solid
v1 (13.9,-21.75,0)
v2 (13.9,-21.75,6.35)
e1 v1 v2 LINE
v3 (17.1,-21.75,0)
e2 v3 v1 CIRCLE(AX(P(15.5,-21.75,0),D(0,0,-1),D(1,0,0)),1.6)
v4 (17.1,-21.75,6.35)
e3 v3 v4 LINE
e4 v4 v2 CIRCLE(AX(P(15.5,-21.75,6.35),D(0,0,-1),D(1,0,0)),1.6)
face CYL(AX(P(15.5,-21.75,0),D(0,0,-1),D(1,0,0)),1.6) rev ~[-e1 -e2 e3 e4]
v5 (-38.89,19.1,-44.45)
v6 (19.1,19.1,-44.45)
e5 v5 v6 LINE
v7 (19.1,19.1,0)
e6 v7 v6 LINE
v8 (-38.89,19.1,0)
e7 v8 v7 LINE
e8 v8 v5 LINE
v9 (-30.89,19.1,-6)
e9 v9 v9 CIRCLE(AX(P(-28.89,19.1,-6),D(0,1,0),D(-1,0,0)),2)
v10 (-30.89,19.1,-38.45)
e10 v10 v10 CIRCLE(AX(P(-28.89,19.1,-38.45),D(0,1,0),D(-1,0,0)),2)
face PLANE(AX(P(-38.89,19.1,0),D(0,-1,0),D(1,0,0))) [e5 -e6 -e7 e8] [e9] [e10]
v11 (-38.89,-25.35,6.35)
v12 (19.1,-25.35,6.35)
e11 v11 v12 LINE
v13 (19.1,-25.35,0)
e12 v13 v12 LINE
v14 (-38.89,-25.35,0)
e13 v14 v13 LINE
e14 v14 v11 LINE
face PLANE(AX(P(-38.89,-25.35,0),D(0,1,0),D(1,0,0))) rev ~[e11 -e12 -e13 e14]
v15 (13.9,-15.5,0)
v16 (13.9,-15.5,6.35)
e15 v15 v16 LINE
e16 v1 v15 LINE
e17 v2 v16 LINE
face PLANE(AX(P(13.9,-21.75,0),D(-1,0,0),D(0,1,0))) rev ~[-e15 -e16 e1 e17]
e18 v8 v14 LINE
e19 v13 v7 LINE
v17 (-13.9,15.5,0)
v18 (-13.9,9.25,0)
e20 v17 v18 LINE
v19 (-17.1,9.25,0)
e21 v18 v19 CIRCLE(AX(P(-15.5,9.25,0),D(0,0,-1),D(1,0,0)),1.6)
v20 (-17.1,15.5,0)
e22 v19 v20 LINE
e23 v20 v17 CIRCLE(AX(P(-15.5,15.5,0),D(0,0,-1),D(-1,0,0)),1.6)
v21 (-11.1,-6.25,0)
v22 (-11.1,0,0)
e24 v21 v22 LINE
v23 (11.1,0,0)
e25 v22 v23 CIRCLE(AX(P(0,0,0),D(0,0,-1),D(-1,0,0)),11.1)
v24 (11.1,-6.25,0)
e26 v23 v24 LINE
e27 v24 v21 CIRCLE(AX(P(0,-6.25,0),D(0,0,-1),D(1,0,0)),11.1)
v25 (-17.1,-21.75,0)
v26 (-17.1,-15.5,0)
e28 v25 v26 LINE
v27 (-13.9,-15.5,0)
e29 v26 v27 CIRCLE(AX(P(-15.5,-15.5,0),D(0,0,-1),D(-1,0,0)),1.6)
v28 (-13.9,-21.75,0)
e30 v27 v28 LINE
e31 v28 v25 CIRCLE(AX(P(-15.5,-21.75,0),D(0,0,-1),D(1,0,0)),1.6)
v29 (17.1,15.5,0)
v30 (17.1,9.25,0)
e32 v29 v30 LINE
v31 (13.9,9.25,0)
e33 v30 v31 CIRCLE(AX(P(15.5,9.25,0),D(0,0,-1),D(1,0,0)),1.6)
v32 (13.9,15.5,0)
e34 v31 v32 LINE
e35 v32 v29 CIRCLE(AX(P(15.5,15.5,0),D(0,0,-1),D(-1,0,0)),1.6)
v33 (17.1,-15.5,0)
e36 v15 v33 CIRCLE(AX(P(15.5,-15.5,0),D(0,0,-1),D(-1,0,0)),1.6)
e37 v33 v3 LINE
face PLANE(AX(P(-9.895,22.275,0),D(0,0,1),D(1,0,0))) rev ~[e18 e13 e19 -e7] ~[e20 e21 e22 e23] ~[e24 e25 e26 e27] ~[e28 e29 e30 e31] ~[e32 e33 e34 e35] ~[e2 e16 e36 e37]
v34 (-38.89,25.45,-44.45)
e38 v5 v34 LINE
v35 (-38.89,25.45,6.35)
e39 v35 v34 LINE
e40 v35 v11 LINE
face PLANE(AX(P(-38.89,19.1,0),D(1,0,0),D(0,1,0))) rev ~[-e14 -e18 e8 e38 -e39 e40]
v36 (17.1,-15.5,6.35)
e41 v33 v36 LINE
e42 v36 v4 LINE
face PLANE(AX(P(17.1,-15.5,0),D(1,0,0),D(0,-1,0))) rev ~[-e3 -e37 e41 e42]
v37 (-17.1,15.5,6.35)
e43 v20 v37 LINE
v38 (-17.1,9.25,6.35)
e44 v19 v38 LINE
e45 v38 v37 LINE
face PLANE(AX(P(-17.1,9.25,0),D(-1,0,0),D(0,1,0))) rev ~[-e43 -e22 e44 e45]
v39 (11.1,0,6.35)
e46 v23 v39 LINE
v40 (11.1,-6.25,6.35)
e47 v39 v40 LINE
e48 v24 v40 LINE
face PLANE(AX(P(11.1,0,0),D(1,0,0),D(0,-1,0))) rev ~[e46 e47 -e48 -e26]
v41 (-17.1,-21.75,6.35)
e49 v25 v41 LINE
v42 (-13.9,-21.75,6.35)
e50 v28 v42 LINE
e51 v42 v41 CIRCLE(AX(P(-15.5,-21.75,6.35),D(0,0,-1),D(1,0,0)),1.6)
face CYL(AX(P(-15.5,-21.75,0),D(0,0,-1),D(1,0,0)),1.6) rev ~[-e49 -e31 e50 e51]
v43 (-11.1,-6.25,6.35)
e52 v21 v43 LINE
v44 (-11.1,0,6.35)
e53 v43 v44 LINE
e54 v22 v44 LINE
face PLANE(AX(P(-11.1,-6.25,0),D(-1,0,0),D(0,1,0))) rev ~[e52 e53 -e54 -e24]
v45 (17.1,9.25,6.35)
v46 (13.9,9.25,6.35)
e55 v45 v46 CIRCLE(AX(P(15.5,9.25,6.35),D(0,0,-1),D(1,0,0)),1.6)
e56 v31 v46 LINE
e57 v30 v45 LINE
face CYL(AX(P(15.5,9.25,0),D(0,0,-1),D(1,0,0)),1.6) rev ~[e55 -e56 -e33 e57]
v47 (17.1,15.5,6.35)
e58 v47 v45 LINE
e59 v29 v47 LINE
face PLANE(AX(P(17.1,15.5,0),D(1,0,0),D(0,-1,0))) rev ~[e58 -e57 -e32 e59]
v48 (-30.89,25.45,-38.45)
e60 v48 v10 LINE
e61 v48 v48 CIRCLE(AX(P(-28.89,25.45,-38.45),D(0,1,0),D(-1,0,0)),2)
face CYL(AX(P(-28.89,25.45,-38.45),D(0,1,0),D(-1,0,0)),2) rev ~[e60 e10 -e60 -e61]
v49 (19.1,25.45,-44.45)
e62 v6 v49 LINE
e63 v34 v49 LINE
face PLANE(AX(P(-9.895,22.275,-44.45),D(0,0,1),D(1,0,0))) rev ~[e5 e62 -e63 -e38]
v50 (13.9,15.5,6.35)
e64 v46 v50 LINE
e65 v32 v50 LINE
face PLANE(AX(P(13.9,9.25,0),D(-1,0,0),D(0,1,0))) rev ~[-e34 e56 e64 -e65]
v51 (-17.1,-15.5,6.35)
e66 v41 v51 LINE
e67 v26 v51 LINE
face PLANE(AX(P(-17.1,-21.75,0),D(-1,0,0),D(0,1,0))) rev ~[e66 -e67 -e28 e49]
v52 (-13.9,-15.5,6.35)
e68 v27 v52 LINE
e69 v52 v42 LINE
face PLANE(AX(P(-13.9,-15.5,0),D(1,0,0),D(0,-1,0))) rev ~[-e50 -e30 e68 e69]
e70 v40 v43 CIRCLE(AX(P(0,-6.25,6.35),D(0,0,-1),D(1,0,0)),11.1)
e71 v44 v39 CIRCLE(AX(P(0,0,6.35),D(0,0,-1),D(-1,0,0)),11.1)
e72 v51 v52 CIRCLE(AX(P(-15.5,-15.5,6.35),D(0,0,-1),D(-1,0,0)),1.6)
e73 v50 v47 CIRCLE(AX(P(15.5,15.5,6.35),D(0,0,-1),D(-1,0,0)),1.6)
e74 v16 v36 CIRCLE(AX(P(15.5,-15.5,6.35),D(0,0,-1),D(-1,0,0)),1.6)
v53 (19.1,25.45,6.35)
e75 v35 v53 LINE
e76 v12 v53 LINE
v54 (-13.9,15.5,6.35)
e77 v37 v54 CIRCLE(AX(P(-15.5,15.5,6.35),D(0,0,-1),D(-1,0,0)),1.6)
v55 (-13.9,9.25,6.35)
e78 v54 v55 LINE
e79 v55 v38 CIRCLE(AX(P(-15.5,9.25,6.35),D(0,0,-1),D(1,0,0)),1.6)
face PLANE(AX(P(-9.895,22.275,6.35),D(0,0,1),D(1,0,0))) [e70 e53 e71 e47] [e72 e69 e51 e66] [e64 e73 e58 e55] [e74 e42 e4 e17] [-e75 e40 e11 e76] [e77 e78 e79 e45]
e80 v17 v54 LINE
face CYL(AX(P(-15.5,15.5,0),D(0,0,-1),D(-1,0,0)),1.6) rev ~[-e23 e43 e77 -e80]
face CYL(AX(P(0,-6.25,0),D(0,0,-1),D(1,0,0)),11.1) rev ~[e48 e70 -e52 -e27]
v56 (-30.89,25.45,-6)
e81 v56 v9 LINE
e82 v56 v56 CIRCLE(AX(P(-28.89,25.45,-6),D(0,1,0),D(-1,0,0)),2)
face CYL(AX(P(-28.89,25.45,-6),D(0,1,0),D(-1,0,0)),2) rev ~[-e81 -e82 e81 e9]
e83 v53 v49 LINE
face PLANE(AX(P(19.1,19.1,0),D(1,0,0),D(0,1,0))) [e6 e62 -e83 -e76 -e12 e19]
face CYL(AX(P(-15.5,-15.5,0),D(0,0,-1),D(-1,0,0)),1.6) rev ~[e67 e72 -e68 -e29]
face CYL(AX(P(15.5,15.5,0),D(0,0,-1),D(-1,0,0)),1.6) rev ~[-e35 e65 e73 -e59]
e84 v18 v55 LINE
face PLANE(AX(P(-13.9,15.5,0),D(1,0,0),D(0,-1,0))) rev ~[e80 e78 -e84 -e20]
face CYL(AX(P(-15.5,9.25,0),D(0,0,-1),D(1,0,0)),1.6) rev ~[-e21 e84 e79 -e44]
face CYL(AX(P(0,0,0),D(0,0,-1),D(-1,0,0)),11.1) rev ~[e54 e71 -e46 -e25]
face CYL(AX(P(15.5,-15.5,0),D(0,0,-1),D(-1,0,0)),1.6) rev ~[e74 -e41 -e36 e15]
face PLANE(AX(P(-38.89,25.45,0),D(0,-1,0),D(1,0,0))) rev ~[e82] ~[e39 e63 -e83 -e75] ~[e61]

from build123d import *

# Parameters (mm, degrees)
F0_W     = 57.99
F0_H     = 6.35
F0_H_2   = 44.45
F1_DEPTH = 6.35
F2_DEPTH = 44.45
F3_R     = 2
F4_DEPTH = 50.801


# Not quite as in the source:
# - a length typed as a fraction of an inch, garbled in the dataset ("3 / 203.2 mm" for 3/8 in), is restored
# - a feature names something its author has since deleted; it is built from what else it names


with BuildPart() as f1:
    # F0 (on Top) → F1 (new body)
    with BuildSketch(Plane.XY):
        with Locations((-9.895, 22.275)):
            Rectangle(F0_W, F0_H)
        with Locations((-9.895, -3.125)):
            Rectangle(F0_W, F0_H_2)
        with BuildLine():
            ThreePointArc((-17.1, -15.5), (-15.5, -13.9), (-13.9, -15.5))
            Line((-13.9, -15.5), (-13.9, -21.75))
            ThreePointArc((-13.9, -21.75), (-15.5, -23.35), (-17.1, -21.75))
            Line((-17.1, -21.75), (-17.1, -15.5))
        make_face(mode=Mode.SUBTRACT)
        with BuildLine():
            ThreePointArc((13.9, -15.5), (15.5, -13.9), (17.1, -15.5))
            Line((17.1, -15.5), (17.1, -21.75))
            ThreePointArc((17.1, -21.75), (15.5, -23.35), (13.9, -21.75))
            Line((13.9, -21.75), (13.9, -15.5))
        make_face(mode=Mode.SUBTRACT)
        with BuildLine():
            ThreePointArc((-11.1, 0), (0, 11.1), (11.1, 0))
            Line((11.1, 0), (11.1, -6.25))
            ThreePointArc((11.1, -6.25), (0, -17.35), (-11.1, -6.25))
            Line((-11.1, -6.25), (-11.1, 0))
        make_face(mode=Mode.SUBTRACT)
        with BuildLine():
            ThreePointArc((-17.1, 15.5), (-15.5, 17.1), (-13.9, 15.5))
            Line((-13.9, 15.5), (-13.9, 9.25))
            ThreePointArc((-13.9, 9.25), (-15.5, 7.65), (-17.1, 9.25))
            Line((-17.1, 9.25), (-17.1, 15.5))
        make_face(mode=Mode.SUBTRACT)
        with BuildLine():
            ThreePointArc((13.9, 15.5), (15.5, 17.1), (17.1, 15.5))
            Line((17.1, 15.5), (17.1, 9.25))
            ThreePointArc((17.1, 9.25), (15.5, 7.65), (13.9, 9.25))
            Line((13.9, 9.25), (13.9, 15.5))
        make_face(mode=Mode.SUBTRACT)
    extrude(amount=F1_DEPTH)

    # F0 (on Top) → F2 (join)
    with BuildSketch(Plane.XY):
        with Locations((-9.895, 22.275)):
            Rectangle(F0_W, F0_H)
    extrude(amount=-F2_DEPTH)

    # F3 (on face) → F4 (cut, through all)
    with BuildSketch(Plane(origin=(0, 25.45, 0), x_dir=(-1, 0, 0), z_dir=(0, 1, 0))):
        with Locations((28.89, -6)):
            Circle(F3_R)
        with Locations((28.89, -38.45)):
            Circle(F3_R)
    extrude(amount=-F4_DEPTH, mode=Mode.SUBTRACT)


solid = f1.part
